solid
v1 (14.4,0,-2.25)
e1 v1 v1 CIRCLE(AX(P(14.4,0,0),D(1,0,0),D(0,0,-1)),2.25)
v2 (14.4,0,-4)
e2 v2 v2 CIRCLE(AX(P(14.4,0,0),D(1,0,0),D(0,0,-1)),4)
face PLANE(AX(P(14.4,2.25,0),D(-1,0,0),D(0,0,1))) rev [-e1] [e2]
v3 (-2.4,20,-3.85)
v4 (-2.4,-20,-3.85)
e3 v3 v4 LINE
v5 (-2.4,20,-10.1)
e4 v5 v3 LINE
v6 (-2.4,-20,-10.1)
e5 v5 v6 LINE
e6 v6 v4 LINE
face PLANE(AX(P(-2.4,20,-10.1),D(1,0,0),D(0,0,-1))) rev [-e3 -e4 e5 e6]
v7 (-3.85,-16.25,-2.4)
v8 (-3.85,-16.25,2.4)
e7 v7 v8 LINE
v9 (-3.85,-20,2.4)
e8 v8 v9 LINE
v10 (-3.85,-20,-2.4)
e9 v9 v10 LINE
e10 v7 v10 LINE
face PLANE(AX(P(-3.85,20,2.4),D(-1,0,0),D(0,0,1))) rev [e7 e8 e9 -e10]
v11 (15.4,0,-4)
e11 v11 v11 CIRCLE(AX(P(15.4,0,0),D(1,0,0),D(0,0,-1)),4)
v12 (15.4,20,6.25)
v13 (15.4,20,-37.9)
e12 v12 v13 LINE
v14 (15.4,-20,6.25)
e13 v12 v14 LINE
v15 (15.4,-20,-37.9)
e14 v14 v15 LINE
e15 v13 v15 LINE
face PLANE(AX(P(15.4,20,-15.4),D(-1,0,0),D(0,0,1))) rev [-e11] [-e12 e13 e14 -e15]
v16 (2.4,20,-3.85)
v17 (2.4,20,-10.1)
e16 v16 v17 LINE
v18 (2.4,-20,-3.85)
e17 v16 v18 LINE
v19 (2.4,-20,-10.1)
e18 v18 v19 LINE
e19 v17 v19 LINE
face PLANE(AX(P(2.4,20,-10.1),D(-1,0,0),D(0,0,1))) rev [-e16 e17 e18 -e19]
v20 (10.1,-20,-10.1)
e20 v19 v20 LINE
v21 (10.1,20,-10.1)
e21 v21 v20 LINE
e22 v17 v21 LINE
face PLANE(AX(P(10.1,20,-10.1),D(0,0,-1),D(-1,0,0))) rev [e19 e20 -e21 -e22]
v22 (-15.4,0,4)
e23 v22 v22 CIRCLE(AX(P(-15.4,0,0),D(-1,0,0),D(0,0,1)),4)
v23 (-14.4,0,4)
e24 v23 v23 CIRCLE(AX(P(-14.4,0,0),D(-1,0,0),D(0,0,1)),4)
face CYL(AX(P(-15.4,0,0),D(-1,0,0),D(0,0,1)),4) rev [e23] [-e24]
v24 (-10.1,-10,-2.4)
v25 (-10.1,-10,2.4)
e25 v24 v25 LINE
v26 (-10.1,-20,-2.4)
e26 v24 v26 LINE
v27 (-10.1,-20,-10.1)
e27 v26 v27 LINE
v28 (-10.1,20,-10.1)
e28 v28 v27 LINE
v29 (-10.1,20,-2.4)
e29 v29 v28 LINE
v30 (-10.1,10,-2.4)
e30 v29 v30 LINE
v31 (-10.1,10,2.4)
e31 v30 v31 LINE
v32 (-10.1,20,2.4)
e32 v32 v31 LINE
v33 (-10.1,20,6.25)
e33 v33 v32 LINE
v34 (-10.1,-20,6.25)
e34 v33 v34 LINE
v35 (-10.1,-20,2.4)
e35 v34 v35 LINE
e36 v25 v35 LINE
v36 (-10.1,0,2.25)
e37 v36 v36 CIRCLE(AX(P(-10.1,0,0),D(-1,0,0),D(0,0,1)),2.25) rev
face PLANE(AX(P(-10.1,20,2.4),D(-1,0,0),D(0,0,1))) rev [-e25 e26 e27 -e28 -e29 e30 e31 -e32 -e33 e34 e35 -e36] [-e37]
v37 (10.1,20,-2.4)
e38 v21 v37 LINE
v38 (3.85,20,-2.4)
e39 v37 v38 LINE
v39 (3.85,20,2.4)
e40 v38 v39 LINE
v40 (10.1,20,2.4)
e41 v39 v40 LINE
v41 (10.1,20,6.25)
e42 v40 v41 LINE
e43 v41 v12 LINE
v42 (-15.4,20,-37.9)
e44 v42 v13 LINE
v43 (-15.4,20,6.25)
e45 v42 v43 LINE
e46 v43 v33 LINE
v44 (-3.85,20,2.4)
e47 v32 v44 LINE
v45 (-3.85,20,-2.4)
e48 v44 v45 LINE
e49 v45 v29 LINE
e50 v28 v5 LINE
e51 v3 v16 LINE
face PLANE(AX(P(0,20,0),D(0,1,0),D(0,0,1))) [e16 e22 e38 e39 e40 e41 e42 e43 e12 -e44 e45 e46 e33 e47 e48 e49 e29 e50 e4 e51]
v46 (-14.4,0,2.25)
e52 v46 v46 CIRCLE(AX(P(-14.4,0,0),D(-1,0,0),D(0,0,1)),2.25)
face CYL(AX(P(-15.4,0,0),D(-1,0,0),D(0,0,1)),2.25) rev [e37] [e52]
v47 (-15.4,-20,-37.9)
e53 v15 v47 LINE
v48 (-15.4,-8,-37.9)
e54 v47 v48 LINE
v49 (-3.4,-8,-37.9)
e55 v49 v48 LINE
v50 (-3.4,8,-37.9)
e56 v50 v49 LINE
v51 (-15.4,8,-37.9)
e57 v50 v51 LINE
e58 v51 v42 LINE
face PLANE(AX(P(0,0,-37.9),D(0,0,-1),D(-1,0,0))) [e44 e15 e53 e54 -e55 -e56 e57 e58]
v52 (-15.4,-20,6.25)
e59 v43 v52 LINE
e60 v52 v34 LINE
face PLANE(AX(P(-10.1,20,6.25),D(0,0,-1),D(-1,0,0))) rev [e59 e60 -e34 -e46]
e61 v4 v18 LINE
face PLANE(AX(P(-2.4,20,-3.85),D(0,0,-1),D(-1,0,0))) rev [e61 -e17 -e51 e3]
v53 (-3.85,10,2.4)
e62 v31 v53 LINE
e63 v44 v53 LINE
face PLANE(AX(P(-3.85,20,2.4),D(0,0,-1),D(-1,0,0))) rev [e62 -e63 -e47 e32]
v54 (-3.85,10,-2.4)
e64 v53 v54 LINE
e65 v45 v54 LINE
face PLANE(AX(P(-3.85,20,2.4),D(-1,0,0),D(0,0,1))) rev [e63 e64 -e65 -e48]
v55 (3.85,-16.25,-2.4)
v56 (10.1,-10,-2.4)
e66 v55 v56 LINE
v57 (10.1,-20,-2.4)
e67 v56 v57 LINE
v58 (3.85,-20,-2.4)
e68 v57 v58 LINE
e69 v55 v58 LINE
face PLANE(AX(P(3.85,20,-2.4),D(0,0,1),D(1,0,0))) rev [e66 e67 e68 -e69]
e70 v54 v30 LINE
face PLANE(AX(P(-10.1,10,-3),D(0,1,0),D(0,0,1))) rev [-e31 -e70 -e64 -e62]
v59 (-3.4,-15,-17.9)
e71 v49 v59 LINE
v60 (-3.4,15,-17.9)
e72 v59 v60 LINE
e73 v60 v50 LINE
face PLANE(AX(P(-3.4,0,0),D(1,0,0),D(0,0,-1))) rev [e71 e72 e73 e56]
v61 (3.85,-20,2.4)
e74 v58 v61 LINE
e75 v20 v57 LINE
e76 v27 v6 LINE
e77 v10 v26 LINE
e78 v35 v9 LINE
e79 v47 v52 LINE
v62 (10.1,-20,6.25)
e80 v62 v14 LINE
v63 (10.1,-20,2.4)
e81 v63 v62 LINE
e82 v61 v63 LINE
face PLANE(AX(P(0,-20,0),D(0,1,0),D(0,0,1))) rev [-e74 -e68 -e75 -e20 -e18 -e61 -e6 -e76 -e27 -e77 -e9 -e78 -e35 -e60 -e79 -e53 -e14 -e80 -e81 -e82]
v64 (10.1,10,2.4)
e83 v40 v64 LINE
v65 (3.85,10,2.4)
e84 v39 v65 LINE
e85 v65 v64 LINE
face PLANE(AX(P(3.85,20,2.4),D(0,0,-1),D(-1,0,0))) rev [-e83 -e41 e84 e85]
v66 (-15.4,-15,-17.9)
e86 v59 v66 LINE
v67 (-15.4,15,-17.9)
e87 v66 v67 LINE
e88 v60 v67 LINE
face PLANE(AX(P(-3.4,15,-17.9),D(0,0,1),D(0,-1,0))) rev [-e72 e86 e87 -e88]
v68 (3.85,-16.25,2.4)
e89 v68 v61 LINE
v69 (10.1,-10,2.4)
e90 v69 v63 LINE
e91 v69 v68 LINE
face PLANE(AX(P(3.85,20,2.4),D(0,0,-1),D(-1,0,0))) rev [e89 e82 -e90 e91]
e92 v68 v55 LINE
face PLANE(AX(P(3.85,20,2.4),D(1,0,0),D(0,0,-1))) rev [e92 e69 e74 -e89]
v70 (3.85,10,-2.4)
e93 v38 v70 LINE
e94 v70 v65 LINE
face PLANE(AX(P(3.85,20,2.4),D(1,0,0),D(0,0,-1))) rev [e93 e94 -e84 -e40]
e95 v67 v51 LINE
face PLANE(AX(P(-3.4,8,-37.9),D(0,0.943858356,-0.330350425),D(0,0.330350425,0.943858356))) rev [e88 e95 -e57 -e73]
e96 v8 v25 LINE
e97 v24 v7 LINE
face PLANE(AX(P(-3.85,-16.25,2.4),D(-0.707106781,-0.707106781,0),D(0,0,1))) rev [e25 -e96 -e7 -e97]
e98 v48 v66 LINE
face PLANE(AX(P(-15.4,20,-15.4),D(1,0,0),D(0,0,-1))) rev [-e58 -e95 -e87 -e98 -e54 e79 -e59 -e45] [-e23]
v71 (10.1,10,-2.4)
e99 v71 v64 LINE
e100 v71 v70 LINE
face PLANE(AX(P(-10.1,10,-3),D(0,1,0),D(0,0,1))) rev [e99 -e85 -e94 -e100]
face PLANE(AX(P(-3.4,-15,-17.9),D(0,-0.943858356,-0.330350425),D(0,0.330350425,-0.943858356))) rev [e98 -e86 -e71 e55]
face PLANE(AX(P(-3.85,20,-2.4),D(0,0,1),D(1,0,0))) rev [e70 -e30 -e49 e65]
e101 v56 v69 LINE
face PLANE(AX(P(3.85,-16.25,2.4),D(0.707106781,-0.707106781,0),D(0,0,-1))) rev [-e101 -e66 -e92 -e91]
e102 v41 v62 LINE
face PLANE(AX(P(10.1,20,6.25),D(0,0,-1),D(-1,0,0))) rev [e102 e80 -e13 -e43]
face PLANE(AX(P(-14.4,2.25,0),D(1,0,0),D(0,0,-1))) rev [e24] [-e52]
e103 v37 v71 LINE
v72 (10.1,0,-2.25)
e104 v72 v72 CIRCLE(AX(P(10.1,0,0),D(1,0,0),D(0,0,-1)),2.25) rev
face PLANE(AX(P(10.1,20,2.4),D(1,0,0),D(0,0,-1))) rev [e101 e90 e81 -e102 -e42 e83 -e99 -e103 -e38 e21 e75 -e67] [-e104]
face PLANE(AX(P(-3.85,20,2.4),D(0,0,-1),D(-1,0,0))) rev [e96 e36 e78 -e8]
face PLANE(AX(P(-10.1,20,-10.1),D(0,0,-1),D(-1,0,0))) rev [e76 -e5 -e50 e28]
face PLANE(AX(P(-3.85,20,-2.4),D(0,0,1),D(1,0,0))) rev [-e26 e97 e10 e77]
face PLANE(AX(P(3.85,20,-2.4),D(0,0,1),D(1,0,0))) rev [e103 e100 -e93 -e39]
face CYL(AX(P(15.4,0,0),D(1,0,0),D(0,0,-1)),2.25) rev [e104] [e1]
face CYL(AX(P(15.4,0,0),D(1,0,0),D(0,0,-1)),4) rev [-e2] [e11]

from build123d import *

# Parameters (mm, degrees)
BOSS_EXTRU_1_DEPTH                                = 20
CHAMBRAGE_POUR_VIS_SIX_PANS_CREUX_M41_D           = 4.5
CHAMBRAGE_POUR_VIS_SIX_PANS_CREUX_M41_DEPTH       = 11.55
CHAMBRAGE_POUR_VIS_SIX_PANS_CREUX_M41_CBORE_D     = 8
CHAMBRAGE_POUR_VIS_SIX_PANS_CREUX_M41_CBORE_DEPTH = 1
ESQUISSE6_W                                       = 20.2
ESQUISSE6_H                                       = 20
ENL_V_MAT_EXTRU_1_DEPTH                           = 3
ESQUISSE14_W                                      = 30.8
ESQUISSE14_H                                      = 2.5
BOSS_EXTRU_3_DEPTH                                = 40
CHANFREIN1_SIZE                                   = 6.25
ESQUISSE15_W                                      = 30.8
ESQUISSE15_H                                      = 40
BOSS_EXTRU_4_DEPTH                                = 20
ENL_V_MAT_EXTRU_2_DEPTH                           = 12


with BuildPart() as part:
    # Base → Boss.-Extru.1 (new, symmetric)
    with BuildSketch(Plane(origin=(0, 0, 0), x_dir=(1, 0, 0), z_dir=(0, 1, 0))):
        Polygon((-3.85, -2.4), (-3.85, 2.4), (-10.1, 2.4), (-10.1, 10.1), (-2.4, 10.1), (-2.4, 3.85), (2.4, 3.85), (2.4, 10.1), (10.1, 10.1), (10.1, 2.4), (3.85, 2.4), (3.85, -2.4), (10.1, -2.4), (10.1, -6.25), (15.4, -6.25), (15.4, 15.4), (-15.4, 15.4), (-15.4, -6.25), (-10.1, -6.25), (-10.1, -2.4), align=None)
    extrude(amount=BOSS_EXTRU_1_DEPTH, both=True)

    # Chambrage pour vis à six pans creux M41
    with Locations(Plane(origin=(15.4, 0, 0), x_dir=(0, 0, -1), z_dir=(1, 0, 0))):
        with Locations((0, 0)):
            chambrage_pour_vis_six_pans_creux_m41 = CounterBoreHole(CHAMBRAGE_POUR_VIS_SIX_PANS_CREUX_M41_D / 2, CHAMBRAGE_POUR_VIS_SIX_PANS_CREUX_M41_CBORE_D / 2, CHAMBRAGE_POUR_VIS_SIX_PANS_CREUX_M41_CBORE_DEPTH, depth=CHAMBRAGE_POUR_VIS_SIX_PANS_CREUX_M41_DEPTH)

    # Symétrie1: Chambrage pour vis à six pans creux M41 across plane
    add(chambrage_pour_vis_six_pans_creux_m41.mirror(Plane(origin=(0, 0, 0), x_dir=(0, 0, 1), z_dir=(1, 0, 0))), mode=Mode.SUBTRACT)

    # Esquisse6 → Enlèv. mat.-Extru.1 (cut, symmetric)
    with BuildSketch(Plane.XY):
        Rectangle(ESQUISSE6_W, ESQUISSE6_H)
    extrude(amount=ENL_V_MAT_EXTRU_1_DEPTH, both=True, mode=Mode.SUBTRACT)

    # Esquisse14 → Boss.-Extru.3 (add)
    with BuildSketch(Plane.XZ.offset(20)):
        with Locations((0, -16.65)):
            Rectangle(ESQUISSE14_W, ESQUISSE14_H)
    extrude(amount=-BOSS_EXTRU_3_DEPTH)

    # Chanfrein1
    chanfrein1_edges = [part.edges().sort_by_distance(p)[0] for p in [
        (3.85, -10, 0),
        (-3.85, -10, 0),
    ]]
    chamfer(chanfrein1_edges, length=CHANFREIN1_SIZE - 0.0001)  # a hair under: the kernel refuses the full size

    # Esquisse15 → Boss.-Extru.4 (add)
    with BuildSketch(Plane(origin=(0, 0, -17.9), x_dir=(-1, 0, 0), z_dir=(0, 0, -1))):
        Rectangle(ESQUISSE15_W, ESQUISSE15_H)
    extrude(amount=BOSS_EXTRU_4_DEPTH)

    # Esquisse17 → Enlèv. mat.-Extru.2 (cut)
    with BuildSketch(Plane.ZY.offset(15.4)):
        Polygon((-37.9, -8), (-37.9, 8), (-17.9, 15), (-17.9, -15), align=None)
    extrude(amount=-ENL_V_MAT_EXTRU_2_DEPTH, mode=Mode.SUBTRACT)


solid = part.part
